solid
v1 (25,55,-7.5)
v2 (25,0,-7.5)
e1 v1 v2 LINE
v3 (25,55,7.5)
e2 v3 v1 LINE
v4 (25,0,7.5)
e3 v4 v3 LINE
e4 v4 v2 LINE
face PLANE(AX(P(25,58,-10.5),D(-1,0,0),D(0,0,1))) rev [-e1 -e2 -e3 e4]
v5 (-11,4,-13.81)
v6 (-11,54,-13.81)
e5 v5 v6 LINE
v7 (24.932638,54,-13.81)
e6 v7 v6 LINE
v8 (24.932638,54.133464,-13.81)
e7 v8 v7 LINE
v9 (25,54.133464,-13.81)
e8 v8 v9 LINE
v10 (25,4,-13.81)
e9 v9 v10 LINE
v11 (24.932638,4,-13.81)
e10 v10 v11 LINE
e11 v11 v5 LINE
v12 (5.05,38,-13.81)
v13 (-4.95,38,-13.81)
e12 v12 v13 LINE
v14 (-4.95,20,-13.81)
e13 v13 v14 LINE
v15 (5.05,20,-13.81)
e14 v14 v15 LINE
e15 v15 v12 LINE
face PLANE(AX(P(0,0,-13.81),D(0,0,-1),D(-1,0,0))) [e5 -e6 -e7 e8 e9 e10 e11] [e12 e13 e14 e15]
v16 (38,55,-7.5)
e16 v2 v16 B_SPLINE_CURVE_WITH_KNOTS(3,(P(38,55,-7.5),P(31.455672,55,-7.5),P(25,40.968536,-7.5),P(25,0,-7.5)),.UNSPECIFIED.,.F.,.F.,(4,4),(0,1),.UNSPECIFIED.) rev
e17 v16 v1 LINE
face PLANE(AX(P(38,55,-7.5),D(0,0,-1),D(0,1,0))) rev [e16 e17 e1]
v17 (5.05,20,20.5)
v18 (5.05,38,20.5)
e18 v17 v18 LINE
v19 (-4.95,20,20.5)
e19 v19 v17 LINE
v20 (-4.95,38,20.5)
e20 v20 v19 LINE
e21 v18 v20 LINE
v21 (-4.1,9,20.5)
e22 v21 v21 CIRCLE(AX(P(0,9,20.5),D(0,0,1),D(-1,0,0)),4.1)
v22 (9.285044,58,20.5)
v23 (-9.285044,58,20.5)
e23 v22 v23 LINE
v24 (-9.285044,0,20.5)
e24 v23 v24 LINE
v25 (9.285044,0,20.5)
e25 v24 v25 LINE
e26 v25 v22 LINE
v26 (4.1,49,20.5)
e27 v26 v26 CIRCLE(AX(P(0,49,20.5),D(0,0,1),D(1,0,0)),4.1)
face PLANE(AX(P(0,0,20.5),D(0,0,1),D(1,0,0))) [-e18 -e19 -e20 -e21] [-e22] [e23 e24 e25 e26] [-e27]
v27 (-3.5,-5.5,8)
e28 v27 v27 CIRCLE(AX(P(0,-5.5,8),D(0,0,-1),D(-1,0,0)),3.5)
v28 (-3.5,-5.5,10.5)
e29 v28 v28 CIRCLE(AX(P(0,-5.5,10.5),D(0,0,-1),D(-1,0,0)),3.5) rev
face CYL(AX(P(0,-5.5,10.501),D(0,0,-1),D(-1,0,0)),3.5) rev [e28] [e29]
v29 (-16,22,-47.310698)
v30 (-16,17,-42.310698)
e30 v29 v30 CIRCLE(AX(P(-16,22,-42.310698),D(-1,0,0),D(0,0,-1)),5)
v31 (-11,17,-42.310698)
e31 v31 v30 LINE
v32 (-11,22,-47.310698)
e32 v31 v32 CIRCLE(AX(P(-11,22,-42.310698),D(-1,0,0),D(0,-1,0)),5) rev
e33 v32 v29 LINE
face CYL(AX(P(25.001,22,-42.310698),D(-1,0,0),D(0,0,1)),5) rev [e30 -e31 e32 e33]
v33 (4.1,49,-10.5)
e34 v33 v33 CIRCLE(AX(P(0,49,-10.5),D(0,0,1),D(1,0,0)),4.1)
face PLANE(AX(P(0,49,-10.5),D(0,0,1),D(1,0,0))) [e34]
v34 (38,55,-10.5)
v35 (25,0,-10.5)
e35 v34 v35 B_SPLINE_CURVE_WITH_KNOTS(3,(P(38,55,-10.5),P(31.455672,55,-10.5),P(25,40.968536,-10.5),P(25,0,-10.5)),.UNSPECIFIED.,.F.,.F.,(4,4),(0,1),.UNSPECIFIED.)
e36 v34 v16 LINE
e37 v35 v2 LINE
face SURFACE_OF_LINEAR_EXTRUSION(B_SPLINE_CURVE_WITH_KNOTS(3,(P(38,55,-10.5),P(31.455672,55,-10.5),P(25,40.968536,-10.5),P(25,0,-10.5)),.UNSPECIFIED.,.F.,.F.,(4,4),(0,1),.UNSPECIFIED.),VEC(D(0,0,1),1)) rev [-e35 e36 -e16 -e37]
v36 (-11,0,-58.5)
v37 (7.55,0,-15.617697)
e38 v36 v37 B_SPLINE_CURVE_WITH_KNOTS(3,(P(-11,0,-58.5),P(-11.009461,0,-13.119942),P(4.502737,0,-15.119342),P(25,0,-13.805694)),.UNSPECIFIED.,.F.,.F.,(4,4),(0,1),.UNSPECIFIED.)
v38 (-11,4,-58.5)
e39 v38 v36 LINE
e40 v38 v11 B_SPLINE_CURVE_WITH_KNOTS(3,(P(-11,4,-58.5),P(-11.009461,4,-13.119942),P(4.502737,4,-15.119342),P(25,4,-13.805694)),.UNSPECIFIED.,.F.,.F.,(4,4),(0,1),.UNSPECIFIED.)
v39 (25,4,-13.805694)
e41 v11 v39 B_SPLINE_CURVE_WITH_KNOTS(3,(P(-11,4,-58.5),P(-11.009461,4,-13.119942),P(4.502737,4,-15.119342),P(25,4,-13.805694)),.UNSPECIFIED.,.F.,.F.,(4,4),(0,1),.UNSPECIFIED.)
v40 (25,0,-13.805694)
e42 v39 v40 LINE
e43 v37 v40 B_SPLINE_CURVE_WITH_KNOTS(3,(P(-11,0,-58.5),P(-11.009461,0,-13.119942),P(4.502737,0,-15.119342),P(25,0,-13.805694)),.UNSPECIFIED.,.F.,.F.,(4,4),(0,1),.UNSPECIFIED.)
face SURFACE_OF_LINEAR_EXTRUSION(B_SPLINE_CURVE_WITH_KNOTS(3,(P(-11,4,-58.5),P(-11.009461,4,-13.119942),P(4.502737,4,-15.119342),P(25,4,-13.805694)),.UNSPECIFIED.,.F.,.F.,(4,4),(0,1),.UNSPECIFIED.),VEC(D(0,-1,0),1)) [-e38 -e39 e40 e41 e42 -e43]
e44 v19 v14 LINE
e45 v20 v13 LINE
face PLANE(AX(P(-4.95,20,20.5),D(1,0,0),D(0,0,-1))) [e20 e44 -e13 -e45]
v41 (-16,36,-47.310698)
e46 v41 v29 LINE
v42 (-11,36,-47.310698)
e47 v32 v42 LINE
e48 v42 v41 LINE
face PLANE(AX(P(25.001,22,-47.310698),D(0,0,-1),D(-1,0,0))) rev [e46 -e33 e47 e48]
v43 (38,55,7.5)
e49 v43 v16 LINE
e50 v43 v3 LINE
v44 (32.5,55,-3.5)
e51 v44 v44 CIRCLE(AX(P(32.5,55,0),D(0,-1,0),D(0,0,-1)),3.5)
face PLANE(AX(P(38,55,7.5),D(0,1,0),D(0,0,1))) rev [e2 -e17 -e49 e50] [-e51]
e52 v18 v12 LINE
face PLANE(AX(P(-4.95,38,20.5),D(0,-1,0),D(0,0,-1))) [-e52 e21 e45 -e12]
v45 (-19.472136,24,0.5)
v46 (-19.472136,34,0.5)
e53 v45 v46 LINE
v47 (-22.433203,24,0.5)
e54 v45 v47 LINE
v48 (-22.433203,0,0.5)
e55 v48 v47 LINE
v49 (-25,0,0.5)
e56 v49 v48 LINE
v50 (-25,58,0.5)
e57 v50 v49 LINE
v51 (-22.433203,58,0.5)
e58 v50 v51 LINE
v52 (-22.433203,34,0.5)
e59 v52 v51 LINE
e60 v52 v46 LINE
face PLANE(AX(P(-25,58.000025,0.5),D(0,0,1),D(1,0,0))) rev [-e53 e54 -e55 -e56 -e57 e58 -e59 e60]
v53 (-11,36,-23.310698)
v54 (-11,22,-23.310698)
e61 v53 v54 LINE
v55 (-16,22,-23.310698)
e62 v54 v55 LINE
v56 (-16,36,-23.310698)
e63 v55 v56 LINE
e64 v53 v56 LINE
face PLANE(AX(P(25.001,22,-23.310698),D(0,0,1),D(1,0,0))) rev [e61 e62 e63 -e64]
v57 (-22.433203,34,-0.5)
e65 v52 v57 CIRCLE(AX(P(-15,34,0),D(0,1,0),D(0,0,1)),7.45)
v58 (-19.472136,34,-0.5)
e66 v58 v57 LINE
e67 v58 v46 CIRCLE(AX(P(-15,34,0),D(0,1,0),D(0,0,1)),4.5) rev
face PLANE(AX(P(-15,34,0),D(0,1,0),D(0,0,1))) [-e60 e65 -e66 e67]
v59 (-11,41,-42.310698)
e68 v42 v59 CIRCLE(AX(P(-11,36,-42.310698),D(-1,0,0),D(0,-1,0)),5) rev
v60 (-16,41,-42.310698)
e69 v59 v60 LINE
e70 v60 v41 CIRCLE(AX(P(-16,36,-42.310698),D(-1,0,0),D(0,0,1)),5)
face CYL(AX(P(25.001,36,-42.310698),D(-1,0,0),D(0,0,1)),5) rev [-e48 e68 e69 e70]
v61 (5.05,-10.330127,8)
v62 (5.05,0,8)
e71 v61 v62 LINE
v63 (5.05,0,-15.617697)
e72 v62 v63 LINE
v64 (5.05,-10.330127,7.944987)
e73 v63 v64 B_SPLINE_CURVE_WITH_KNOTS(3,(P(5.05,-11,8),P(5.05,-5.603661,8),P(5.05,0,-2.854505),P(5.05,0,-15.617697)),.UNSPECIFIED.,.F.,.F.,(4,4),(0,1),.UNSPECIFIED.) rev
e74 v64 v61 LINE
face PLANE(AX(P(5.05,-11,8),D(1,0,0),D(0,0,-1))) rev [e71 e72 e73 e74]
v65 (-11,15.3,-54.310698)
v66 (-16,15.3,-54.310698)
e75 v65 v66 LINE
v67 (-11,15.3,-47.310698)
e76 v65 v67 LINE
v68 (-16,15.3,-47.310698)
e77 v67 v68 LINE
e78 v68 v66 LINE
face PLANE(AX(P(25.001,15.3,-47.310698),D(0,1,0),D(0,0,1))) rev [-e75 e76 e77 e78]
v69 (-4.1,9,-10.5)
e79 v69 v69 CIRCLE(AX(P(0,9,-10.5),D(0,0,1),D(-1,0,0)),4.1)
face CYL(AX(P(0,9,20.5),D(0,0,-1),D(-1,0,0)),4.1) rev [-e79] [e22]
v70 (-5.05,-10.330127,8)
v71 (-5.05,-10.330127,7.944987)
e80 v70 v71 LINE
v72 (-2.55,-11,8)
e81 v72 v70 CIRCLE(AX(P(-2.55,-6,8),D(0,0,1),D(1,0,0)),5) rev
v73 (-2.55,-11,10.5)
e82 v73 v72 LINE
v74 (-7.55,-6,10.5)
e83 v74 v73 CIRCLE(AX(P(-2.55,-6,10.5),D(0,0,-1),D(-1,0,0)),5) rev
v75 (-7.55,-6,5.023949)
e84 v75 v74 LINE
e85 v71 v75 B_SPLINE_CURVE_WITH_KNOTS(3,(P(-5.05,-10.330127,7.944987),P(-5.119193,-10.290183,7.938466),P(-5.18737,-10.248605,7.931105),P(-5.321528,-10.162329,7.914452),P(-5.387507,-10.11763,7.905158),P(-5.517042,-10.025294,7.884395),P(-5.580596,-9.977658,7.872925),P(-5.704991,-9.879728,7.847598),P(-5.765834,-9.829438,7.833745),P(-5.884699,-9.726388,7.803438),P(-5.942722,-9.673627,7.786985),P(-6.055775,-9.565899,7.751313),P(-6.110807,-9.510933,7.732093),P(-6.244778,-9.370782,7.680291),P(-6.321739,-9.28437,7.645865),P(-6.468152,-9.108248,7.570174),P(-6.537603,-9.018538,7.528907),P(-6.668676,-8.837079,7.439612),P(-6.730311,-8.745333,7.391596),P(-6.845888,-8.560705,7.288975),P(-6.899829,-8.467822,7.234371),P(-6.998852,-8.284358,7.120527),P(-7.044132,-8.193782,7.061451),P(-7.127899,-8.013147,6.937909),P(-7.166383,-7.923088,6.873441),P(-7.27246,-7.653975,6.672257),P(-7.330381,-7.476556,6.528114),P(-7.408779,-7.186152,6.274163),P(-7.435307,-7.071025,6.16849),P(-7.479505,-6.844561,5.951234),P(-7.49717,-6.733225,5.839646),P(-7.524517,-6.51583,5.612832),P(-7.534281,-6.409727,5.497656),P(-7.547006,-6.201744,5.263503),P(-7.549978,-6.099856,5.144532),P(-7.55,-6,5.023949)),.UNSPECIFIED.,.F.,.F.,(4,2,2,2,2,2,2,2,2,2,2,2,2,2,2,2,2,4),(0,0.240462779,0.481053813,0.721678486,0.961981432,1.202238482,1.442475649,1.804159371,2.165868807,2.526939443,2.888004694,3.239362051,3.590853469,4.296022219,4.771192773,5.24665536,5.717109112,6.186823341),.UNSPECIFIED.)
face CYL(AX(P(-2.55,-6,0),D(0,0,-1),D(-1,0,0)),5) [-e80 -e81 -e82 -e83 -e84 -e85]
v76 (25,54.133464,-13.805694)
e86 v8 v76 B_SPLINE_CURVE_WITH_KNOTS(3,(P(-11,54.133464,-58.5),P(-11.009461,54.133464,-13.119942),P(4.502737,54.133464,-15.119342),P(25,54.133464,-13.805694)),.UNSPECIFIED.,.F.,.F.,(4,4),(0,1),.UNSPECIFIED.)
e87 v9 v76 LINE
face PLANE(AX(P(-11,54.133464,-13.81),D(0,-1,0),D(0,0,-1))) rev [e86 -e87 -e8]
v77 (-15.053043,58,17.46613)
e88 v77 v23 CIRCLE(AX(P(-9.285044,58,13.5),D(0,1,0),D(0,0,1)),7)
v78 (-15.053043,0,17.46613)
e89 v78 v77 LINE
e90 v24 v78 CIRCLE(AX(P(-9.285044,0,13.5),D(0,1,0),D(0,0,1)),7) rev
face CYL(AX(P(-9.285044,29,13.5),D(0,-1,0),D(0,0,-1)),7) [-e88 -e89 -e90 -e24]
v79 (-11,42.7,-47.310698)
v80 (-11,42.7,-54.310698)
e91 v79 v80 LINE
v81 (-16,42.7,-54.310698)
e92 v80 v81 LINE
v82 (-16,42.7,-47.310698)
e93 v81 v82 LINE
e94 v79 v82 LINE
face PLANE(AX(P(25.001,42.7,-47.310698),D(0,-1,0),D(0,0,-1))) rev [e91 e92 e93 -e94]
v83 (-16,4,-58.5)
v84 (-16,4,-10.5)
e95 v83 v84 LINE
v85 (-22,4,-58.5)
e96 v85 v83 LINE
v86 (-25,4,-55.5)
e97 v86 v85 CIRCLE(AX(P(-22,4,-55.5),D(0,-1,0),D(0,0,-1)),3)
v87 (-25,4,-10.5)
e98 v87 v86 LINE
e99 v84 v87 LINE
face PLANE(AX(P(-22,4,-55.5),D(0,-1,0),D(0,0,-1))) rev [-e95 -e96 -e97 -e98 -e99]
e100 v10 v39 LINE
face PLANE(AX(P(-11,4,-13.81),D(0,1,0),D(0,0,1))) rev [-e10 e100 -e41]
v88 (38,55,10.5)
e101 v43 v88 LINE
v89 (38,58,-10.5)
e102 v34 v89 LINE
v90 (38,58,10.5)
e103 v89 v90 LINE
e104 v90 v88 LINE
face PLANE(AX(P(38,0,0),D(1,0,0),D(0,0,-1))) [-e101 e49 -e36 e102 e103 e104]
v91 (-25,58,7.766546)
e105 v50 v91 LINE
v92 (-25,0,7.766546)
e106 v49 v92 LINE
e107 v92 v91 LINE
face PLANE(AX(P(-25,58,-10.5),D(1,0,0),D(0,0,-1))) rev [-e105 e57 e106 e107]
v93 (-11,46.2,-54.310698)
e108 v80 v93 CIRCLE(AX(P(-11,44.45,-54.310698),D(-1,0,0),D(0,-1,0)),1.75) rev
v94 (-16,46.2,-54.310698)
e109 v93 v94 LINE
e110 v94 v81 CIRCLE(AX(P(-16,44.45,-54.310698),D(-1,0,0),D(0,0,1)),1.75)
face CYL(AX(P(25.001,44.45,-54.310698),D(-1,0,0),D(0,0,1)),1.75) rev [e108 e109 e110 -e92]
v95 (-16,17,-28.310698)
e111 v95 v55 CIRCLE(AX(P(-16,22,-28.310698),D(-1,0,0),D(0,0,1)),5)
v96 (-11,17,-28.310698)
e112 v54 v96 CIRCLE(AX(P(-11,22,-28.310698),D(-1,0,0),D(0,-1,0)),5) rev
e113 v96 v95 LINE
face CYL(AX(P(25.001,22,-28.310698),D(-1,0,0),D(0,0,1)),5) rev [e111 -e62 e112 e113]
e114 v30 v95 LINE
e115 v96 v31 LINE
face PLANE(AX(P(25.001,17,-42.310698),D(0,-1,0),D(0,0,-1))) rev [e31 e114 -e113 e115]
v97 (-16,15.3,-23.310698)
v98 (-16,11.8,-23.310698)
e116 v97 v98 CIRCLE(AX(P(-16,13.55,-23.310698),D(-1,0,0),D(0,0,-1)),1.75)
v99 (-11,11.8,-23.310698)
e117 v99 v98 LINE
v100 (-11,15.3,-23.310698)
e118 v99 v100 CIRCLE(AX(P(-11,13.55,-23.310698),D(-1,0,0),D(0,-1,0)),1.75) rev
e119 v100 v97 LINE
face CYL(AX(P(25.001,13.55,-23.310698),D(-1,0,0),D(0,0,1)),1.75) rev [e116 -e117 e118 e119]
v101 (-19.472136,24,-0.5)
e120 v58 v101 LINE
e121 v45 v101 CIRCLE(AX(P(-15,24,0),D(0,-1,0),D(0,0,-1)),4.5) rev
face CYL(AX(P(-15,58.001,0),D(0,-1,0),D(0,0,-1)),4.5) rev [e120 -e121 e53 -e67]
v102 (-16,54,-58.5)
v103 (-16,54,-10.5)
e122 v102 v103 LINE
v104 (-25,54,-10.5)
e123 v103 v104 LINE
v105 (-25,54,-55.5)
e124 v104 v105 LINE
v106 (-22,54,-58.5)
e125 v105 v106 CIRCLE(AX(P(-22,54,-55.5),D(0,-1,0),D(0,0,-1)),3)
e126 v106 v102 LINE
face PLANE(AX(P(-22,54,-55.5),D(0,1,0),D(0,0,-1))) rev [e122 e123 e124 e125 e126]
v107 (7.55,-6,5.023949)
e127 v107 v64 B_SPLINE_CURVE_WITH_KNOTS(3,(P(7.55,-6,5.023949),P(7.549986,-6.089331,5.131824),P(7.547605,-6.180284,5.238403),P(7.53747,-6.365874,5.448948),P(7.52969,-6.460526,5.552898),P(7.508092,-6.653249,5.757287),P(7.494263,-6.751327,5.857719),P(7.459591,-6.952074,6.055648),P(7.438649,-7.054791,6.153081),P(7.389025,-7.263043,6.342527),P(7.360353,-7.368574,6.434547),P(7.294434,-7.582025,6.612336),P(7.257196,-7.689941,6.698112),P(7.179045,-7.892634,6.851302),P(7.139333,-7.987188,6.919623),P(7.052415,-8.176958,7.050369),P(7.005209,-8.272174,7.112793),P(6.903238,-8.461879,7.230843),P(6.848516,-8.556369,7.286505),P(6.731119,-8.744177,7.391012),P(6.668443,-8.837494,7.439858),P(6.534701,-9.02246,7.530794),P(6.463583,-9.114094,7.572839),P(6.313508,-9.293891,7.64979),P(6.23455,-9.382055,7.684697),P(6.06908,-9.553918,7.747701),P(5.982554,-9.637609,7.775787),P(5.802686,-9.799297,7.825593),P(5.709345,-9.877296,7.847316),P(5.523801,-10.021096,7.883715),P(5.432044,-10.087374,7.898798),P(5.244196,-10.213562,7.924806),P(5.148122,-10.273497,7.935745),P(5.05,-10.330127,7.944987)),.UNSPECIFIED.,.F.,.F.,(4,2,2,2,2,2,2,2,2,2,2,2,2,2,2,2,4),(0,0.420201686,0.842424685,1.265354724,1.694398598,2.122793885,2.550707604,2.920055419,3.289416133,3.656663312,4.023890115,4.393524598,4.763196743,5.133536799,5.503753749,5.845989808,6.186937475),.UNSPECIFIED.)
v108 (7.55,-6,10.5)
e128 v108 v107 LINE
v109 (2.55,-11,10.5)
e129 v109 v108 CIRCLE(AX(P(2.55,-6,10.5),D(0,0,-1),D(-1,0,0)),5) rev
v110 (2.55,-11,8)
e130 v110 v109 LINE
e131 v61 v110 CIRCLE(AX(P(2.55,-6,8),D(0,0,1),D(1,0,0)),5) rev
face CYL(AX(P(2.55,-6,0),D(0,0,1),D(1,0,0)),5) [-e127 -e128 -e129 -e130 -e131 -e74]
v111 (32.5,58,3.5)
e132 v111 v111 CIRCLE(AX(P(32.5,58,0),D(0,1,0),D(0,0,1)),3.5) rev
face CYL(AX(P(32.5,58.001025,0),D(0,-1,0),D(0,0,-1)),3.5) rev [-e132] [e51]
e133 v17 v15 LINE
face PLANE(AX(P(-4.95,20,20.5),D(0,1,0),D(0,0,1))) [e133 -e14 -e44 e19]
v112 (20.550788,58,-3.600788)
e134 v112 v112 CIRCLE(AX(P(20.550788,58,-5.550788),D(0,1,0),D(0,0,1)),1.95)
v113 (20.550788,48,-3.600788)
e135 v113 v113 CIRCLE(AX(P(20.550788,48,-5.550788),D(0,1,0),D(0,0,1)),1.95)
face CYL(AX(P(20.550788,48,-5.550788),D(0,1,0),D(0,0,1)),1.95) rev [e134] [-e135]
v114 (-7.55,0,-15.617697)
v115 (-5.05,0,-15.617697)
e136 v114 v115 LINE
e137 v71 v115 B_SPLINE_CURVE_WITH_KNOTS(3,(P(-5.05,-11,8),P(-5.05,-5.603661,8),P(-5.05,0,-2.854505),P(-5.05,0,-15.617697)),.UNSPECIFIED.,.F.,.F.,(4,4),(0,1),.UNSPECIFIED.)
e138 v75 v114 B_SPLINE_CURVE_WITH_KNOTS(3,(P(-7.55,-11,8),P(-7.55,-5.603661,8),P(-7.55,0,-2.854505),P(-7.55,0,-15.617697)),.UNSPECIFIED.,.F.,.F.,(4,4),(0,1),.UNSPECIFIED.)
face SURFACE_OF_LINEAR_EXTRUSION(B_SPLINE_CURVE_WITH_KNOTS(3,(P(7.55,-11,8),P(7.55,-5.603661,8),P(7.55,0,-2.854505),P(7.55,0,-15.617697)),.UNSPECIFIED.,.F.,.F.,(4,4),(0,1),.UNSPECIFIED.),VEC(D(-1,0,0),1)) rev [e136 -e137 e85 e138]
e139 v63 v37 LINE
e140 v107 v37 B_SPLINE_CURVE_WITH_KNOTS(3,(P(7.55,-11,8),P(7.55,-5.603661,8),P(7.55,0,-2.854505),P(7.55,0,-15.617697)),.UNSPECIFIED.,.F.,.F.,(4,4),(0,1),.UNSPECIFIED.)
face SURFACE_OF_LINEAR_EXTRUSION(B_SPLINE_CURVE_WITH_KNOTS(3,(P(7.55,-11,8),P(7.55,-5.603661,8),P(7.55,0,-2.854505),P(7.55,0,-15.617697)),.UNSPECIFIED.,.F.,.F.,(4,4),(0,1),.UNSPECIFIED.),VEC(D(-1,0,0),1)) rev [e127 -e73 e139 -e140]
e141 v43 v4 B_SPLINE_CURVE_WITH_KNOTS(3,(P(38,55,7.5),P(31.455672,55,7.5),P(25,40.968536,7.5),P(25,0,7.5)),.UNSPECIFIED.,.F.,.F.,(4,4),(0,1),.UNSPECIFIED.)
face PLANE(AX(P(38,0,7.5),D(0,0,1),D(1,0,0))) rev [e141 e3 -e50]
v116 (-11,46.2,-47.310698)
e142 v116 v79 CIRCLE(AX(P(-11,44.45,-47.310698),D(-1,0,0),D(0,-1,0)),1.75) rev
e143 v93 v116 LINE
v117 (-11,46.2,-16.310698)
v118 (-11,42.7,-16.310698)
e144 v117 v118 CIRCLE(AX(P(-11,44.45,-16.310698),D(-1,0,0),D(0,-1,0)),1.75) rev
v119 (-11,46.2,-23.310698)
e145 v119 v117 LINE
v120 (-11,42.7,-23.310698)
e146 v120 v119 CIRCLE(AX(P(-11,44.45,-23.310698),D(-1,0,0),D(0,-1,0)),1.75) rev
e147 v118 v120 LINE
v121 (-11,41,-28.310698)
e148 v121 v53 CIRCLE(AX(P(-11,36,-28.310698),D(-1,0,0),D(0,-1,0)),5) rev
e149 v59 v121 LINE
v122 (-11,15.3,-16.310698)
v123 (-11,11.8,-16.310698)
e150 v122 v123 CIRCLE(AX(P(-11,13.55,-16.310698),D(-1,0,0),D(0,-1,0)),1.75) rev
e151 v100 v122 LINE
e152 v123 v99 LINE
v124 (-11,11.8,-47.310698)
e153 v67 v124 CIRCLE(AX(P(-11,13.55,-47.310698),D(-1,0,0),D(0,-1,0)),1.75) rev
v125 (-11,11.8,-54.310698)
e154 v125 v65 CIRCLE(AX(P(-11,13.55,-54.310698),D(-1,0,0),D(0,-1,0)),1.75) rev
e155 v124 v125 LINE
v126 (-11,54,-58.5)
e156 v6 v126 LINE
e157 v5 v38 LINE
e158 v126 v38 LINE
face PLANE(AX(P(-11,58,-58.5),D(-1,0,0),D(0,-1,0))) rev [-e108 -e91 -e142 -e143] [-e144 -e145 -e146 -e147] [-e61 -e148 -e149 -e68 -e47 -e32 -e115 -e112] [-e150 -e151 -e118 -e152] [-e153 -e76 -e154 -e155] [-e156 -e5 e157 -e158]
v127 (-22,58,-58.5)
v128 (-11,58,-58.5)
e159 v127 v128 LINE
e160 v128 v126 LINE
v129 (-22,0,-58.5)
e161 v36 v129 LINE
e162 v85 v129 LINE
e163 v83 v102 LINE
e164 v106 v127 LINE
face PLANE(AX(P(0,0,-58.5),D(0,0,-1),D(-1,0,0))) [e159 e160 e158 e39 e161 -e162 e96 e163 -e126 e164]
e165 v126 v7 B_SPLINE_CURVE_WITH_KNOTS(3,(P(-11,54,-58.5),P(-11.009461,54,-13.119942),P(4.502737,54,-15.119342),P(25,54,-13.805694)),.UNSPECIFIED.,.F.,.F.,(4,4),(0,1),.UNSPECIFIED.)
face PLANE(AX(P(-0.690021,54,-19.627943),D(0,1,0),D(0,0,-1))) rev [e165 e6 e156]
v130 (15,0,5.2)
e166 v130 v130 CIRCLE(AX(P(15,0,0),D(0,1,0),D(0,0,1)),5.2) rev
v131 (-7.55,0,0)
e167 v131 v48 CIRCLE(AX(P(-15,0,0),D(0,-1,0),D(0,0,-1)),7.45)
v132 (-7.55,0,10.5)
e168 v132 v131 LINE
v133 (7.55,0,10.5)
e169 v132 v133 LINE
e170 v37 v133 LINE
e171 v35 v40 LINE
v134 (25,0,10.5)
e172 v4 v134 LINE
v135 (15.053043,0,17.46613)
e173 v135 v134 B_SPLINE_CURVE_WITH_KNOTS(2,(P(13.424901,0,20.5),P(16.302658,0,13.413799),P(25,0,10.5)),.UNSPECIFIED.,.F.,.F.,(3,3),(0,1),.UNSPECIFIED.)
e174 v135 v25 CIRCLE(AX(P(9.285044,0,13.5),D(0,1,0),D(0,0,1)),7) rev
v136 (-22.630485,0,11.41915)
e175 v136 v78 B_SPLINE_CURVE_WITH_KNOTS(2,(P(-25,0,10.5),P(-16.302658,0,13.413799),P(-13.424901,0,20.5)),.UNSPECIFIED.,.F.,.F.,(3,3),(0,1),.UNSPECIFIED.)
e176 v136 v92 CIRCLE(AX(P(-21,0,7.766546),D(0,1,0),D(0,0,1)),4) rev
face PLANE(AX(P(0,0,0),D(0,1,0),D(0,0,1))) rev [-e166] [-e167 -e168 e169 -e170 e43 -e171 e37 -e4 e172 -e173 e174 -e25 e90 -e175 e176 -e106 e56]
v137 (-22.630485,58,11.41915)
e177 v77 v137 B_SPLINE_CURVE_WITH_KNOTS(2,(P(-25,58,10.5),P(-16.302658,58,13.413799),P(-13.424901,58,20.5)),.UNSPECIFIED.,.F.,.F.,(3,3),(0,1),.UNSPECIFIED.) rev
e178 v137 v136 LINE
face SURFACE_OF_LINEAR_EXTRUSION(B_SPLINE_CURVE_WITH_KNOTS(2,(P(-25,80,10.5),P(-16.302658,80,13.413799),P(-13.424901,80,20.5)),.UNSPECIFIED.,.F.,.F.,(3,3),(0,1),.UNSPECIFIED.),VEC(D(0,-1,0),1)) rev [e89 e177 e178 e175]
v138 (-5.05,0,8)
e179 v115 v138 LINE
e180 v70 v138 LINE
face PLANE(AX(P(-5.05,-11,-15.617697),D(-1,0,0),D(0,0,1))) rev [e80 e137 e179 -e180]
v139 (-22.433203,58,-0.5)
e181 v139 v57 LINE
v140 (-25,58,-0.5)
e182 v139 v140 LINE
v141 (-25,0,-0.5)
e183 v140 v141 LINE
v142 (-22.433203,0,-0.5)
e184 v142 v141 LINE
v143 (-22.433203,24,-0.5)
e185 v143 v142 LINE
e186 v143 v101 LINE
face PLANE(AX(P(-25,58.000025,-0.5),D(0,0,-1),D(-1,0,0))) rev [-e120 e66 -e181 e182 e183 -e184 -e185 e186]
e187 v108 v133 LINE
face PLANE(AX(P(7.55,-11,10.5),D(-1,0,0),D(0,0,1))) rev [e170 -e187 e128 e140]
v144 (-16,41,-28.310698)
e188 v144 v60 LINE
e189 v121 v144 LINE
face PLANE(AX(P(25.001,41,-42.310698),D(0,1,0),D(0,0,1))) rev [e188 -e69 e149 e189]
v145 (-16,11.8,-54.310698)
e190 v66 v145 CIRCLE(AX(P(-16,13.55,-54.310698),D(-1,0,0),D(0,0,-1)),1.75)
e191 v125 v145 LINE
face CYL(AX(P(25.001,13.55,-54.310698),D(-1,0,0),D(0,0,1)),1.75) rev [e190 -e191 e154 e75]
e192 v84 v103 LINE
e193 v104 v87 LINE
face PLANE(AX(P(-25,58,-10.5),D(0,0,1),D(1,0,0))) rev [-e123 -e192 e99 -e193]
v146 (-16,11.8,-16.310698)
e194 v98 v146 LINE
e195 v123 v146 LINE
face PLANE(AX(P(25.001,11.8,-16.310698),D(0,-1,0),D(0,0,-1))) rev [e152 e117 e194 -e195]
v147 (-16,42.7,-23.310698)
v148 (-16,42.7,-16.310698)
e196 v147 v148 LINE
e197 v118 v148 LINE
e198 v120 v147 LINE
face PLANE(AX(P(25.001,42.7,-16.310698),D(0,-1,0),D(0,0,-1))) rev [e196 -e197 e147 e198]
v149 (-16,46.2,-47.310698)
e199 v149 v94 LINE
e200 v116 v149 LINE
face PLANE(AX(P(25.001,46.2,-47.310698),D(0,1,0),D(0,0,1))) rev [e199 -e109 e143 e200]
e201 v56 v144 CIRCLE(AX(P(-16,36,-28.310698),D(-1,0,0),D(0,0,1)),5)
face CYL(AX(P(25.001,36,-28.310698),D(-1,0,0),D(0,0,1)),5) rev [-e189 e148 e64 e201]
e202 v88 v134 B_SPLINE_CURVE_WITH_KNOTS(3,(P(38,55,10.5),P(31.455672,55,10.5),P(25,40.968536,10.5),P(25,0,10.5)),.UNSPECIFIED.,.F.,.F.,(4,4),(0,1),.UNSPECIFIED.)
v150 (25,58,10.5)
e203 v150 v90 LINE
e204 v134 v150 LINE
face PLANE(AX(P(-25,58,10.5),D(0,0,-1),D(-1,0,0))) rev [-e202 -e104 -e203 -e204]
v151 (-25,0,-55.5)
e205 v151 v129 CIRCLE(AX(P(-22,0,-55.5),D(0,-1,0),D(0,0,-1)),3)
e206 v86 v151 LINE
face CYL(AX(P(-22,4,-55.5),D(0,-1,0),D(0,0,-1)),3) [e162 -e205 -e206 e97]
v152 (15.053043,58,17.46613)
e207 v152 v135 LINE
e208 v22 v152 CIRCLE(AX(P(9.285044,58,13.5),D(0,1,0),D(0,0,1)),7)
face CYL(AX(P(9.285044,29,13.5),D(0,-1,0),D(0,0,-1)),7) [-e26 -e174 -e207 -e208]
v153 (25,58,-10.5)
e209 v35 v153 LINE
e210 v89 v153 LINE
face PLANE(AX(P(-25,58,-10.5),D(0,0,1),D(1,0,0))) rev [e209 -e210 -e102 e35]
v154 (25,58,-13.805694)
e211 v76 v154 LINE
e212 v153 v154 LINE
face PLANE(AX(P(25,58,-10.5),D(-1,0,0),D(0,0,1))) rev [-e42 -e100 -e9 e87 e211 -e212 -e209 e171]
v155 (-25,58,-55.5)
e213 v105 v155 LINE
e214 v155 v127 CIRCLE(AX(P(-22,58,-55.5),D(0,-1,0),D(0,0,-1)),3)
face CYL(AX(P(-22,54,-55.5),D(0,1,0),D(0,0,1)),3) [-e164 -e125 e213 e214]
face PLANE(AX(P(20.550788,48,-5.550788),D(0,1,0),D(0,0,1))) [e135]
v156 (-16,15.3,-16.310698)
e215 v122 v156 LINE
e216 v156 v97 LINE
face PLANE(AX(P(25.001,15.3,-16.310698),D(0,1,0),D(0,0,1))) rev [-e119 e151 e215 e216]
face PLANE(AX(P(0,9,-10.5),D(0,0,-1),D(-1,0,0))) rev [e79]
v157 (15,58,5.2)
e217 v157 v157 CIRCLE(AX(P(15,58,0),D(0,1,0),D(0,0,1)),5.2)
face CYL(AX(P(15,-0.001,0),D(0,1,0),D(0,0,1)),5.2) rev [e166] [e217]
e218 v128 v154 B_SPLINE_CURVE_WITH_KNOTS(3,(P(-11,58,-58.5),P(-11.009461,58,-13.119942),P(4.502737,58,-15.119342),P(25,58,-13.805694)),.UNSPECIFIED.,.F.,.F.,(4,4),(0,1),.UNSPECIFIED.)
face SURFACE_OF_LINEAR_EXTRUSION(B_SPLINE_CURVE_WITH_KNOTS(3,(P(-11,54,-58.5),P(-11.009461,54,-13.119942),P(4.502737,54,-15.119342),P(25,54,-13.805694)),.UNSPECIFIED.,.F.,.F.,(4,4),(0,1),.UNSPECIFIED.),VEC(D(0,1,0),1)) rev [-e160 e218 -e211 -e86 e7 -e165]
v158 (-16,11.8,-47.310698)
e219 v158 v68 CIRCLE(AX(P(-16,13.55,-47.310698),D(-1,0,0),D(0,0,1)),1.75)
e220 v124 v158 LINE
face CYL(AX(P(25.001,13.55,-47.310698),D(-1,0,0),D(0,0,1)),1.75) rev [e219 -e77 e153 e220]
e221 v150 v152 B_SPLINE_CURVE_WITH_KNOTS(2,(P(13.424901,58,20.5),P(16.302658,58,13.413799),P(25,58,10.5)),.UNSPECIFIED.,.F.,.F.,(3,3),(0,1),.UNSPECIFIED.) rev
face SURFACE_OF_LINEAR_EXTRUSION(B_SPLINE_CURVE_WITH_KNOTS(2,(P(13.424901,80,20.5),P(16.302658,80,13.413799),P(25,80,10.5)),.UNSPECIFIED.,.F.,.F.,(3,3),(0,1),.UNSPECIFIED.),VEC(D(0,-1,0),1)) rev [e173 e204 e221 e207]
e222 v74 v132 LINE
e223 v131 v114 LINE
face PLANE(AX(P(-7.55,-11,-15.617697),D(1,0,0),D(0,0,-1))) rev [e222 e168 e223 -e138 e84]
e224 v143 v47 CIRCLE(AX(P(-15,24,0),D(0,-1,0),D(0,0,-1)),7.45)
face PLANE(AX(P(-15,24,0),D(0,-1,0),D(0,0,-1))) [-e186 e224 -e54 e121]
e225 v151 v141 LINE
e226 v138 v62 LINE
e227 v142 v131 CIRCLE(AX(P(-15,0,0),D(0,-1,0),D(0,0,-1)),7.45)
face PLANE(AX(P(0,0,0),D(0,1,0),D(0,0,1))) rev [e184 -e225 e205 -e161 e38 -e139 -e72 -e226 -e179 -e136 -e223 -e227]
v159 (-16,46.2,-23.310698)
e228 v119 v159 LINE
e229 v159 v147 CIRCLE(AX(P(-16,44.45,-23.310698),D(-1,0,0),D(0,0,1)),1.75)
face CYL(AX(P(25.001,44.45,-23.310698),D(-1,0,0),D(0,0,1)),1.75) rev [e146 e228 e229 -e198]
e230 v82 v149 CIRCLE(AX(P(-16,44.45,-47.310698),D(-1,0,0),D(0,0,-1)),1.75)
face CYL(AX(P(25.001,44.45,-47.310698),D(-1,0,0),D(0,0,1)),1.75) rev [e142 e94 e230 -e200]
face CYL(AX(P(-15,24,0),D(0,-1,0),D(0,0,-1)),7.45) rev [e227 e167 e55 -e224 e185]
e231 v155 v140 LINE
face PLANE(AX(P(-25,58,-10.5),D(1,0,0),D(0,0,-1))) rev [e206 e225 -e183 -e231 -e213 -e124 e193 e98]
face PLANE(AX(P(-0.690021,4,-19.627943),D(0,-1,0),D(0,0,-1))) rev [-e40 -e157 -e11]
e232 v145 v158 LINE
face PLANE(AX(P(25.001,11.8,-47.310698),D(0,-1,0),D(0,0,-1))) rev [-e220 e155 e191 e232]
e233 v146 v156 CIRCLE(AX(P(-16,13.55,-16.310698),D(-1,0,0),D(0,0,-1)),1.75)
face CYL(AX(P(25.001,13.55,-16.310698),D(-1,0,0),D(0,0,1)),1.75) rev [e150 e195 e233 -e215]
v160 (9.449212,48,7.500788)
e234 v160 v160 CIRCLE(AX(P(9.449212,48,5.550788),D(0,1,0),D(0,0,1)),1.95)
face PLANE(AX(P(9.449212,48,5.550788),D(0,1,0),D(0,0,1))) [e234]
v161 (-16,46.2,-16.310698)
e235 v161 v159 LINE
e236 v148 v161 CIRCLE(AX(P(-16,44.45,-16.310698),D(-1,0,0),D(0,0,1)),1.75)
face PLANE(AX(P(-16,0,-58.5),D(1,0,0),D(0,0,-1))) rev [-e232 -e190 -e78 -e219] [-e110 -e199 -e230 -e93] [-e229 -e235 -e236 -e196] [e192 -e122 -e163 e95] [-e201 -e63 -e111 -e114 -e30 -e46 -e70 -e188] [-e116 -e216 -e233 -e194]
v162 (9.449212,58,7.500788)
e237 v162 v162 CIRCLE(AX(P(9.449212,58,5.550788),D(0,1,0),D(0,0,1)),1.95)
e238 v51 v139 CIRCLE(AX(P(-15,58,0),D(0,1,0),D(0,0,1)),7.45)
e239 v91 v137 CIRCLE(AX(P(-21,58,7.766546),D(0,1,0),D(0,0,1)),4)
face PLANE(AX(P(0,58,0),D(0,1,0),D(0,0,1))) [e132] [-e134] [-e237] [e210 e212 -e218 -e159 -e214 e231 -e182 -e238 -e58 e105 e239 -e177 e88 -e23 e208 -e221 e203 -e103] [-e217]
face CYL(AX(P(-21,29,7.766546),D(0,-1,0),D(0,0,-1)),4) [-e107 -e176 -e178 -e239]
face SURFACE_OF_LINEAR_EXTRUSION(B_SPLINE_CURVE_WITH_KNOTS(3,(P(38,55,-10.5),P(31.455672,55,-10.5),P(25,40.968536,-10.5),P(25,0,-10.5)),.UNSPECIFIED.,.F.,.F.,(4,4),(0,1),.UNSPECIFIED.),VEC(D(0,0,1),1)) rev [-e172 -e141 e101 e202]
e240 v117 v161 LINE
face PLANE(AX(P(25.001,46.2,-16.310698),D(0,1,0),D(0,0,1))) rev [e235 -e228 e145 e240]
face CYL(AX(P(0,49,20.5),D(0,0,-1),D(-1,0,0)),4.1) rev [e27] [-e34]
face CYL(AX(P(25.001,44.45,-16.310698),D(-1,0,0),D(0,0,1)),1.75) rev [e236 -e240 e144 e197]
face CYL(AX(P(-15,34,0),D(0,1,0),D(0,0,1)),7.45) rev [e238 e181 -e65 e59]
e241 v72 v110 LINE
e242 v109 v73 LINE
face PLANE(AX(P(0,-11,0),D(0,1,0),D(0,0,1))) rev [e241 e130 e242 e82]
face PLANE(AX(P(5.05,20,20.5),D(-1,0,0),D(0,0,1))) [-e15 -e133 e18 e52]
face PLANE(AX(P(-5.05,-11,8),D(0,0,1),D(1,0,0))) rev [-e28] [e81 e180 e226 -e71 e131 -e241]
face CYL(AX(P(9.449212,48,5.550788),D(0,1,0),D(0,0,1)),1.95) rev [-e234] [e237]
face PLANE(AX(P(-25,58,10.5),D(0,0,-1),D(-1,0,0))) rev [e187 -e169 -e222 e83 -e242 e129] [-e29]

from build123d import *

# Parameters (mm, degrees)
SKETCH1_W                      = 50
SKETCH1_H                      = 21
BOSS_EXTRUDE1_DEPTH            = 58
SKETCH3_R                      = 7.45
CUT_EXTRUDE1_DEPTH             = 24
CUT_EXTRUDE2_REACH             = 66.025
SKETCH4_R                      = 5.2
CUT_EXTRUDE3_START             = -24
SKETCH5_R                      = 7.45
CUT_EXTRUDE3_DEPTH             = 24
CUT_EXTRUDE4_REACH             = 66.025
SKETCH6_R                      = 4.5
SKETCH9_W                      = 5
SKETCH9_H                      = 58
BOSS_EXTRUDE3_DEPTH            = 48
CUT_EXTRUDE7_REACH             = 94.018
BOSS_EXTRUDE4_START            = -4
BOSS_EXTRUDE4_DEPTH            = 4
SKETCH19_R                     = 1.95
CUT_EXTRUDE11_DEPTH            = 10
CUT_EXTRUDE12_DEPTH            = 87.088617298
CUT_EXTRUDE12_DEPTH_BACK       = 87.088617298
SKETCH20_W                     = 5.527864045
SKETCH20_H                     = 1
BOSS_EXTRUDE5_DEPTH            = 13
CUT_EXTRUDE13_START            = -21
CUT_EXTRUDE13_DEPTH            = 21
CUT_EXTRUDE14_REACH            = 90.833
SKETCH23_R                     = 3.5
BOSS_EXTRUDE7_DEPTH            = 11
CUT_EXTRUDE15_REACH            = 98.074
SKETCH26_R                     = 3.5
CUT_EXTRUDE16_DEPTH            = 15.1
SKETCH29_W                     = 50
SKETCH29_H                     = 58
BOSS_EXTRUDE8_DEPTH            = 10
CUT_EXTRUDE17_DEPTH            = 80
FILLET3_R                      = 7
FILLET5_R                      = 7
FILLET6_R                      = 4
SKETCH31_W                     = 36
SKETCH31_H                     = 50.133464381
BOSS_EXTRUDE9_DEPTH            = 3.31
CUT_EXTRUDE8_DEPTH             = 98.82126575
CUT_EXTRUDE8_DEPTH_BACK        = 21
SKETCH7_R                      = 4.1
CUT_EXTRUDE5_REACH             = 99.821
SKETCH8_W                      = 10
SKETCH8_H                      = 18
CUT_EXTRUDE5_DIRECTION_2_DEPTH = 98.82126575
FILLET7_R                      = 5


# Read off the part's stored shape, not the designer's step: Boss-Extrude4
with BuildPart() as part:
    # Sketch1 → Boss-Extrude1 (new body)
    with BuildSketch(Plane(origin=(0, 0, 0), x_dir=(1, 0, 0), z_dir=(0, 1, 0))):
        Rectangle(SKETCH1_W, SKETCH1_H)
    extrude(amount=BOSS_EXTRUDE1_DEPTH)

    # Sketch3 → Cut-Extrude1 (cut)
    with BuildSketch(Plane(origin=(0, 58, 0), x_dir=(1, 0, 0), z_dir=(0, 1, 0))):
        with Locations(Location((-15, 0, 0), (0, 0, 270))):
            Circle(SKETCH3_R)
    extrude(amount=-CUT_EXTRUDE1_DEPTH, mode=Mode.SUBTRACT)

    # Sketch4 → Cut-Extrude2 (cut, up to next)
    with BuildSketch(Plane(origin=(0, 58, 0), x_dir=(1, 0, 0), z_dir=(0, 1, 0)), mode=Mode.PRIVATE) as cut_extrude2_sk1:
        with Locations(Location((15, 0, 0), (0, 0, 270))):
            Circle(SKETCH4_R)
    cut_extrude2_tool1 = extrude(cut_extrude2_sk1.sketch, amount=-CUT_EXTRUDE2_REACH, mode=Mode.PRIVATE) & part.part
    add(cut_extrude2_tool1.solids().sort_by_distance((15, 58, 0))[0], mode=Mode.SUBTRACT)

    # Sketch5 → Cut-Extrude3 (cut)
    with BuildSketch(Plane.XZ.offset(CUT_EXTRUDE3_START)):
        with Locations(Location((-15, 0, 0), (0, 0, 90))):
            Circle(SKETCH5_R)
    extrude(amount=CUT_EXTRUDE3_DEPTH, mode=Mode.SUBTRACT)

    # Sketch6 → Cut-Extrude4 (cut, up to next)
    with BuildSketch(Plane.XZ, mode=Mode.PRIVATE) as cut_extrude4_sk1:
        with Locations(Location((-15, 0, 0), (0, 0, 270))):
            Circle(SKETCH6_R)
    cut_extrude4_tool1 = extrude(cut_extrude4_sk1.sketch, amount=-CUT_EXTRUDE4_REACH, mode=Mode.PRIVATE) & part.part
    add(cut_extrude4_tool1.solids().sort_by_distance((-15, 0, 0))[0], mode=Mode.SUBTRACT)

    # Sketch9 → Boss-Extrude3 (add)
    with BuildSketch(Plane(origin=(0, 0, -10.5), x_dir=(-1, 0, 0), z_dir=(0, 0, -1))):
        with Locations((13.5, 29)):
            Rectangle(SKETCH9_W, SKETCH9_H)
    extrude(amount=BOSS_EXTRUDE3_DEPTH)

    # Sketch10 → Cut-Extrude7 (cut, up to next)
    with BuildSketch(Plane.ZY.offset(16), mode=Mode.PRIVATE) as cut_extrude7_sk1:
        with BuildLine():
            Line((-47.310698145, 46.2), (-54.310698145, 46.2))
            ThreePointArc((-54.310698145, 46.2), (-56.060698145, 44.45), (-54.310698145, 42.7))
            Line((-54.310698145, 42.7), (-47.310698145, 42.7))
            ThreePointArc((-47.310698145, 42.7), (-45.560698145, 44.45), (-47.310698145, 46.2))
        make_face()
    cut_extrude7_tool1 = extrude(cut_extrude7_sk1.sketch, amount=-CUT_EXTRUDE7_REACH, mode=Mode.PRIVATE) & part.part
    # Sketch10 → Cut-Extrude7 (cut, up to next)
    with BuildSketch(Plane.ZY.offset(16), mode=Mode.PRIVATE) as cut_extrude7_sk2:
        with BuildLine():
            Line((-42.310698145, 17), (-28.310698145, 17))
            ThreePointArc((-28.310698145, 17), (-24.775164239, 18.464466094), (-23.310698145, 22))
            Line((-23.310698145, 22), (-23.310698145, 36))
            ThreePointArc((-23.310698145, 36), (-24.775164239, 39.535533906), (-28.310698145, 41))
            Line((-28.310698145, 41), (-42.310698145, 41))
            ThreePointArc((-42.310698145, 41), (-45.84623205, 39.535533906), (-47.310698145, 36))
            Line((-47.310698145, 36), (-47.310698145, 22))
            ThreePointArc((-47.310698145, 22), (-45.84623205, 18.464466094), (-42.310698145, 17))
        make_face()
    cut_extrude7_tool2 = extrude(cut_extrude7_sk2.sketch, amount=-CUT_EXTRUDE7_REACH, mode=Mode.PRIVATE) & part.part
    # Sketch10 → Cut-Extrude7 (cut, up to next)
    with BuildSketch(Plane.ZY.offset(16), mode=Mode.PRIVATE) as cut_extrude7_sk3:
        with BuildLine():
            Line((-16.310698145, 15.3), (-23.310698145, 15.3))
            ThreePointArc((-23.310698145, 15.3), (-25.060698145, 13.55), (-23.310698145, 11.8))
            Line((-23.310698145, 11.8), (-16.310698145, 11.8))
            ThreePointArc((-16.310698145, 11.8), (-14.560698145, 13.55), (-16.310698145, 15.3))
        make_face()
    cut_extrude7_tool3 = extrude(cut_extrude7_sk3.sketch, amount=-CUT_EXTRUDE7_REACH, mode=Mode.PRIVATE) & part.part
    # Sketch10 → Cut-Extrude7 (cut, up to next)
    with BuildSketch(Plane.ZY.offset(16), mode=Mode.PRIVATE) as cut_extrude7_sk4:
        with BuildLine():
            Line((-47.310698145, 11.8), (-54.310698145, 11.8))
            ThreePointArc((-54.310698145, 11.8), (-56.060698145, 13.55), (-54.310698145, 15.3))
            Line((-54.310698145, 15.3), (-47.310698145, 15.3))
            ThreePointArc((-47.310698145, 15.3), (-45.560698145, 13.55), (-47.310698145, 11.8))
        make_face()
    cut_extrude7_tool4 = extrude(cut_extrude7_sk4.sketch, amount=-CUT_EXTRUDE7_REACH, mode=Mode.PRIVATE) & part.part
    # Sketch10 → Cut-Extrude7 (cut, up to next)
    with BuildSketch(Plane.ZY.offset(16), mode=Mode.PRIVATE) as cut_extrude7_sk5:
        with BuildLine():
            Line((-16.310698145, 46.2), (-23.310698145, 46.2))
            ThreePointArc((-23.310698145, 46.2), (-25.060698145, 44.45), (-23.310698145, 42.7))
            Line((-23.310698145, 42.7), (-16.310698145, 42.7))
            ThreePointArc((-16.310698145, 42.7), (-14.560698145, 44.45), (-16.310698145, 46.2))
        make_face()
    cut_extrude7_tool5 = extrude(cut_extrude7_sk5.sketch, amount=-CUT_EXTRUDE7_REACH, mode=Mode.PRIVATE) & part.part
    add(cut_extrude7_tool1.solids().sort_by_distance((-16, 44.45, -50.810698))[0], mode=Mode.SUBTRACT)
    add(cut_extrude7_tool2.solids().sort_by_distance((-16, 29, -35.310698))[0], mode=Mode.SUBTRACT)
    add(cut_extrude7_tool3.solids().sort_by_distance((-16, 13.55, -19.810698))[0], mode=Mode.SUBTRACT)
    add(cut_extrude7_tool4.solids().sort_by_distance((-16, 13.55, -50.810698))[0], mode=Mode.SUBTRACT)
    add(cut_extrude7_tool5.solids().sort_by_distance((-16, 44.45, -19.810698))[0], mode=Mode.SUBTRACT)

    # Boss-Extrude4 outline → Boss-Extrude4 (add)
    with BuildSketch(Plane(origin=(0, 0, 0), x_dir=(-1, 0, 0), z_dir=(0, -1, 0)).offset(BOSS_EXTRUDE4_START)):
        with BuildLine():
            Line((11, 10.5), (11, 58.5))
            add(Edge.make_bspline(
                [(11, 58.5), (11.009460691, 13.119942058), (-4.502737222, 15.119341911), (-25, 13.805693573)],
                knots=[0, 0, 0, 0, 1, 1, 1, 1], degree=3))
            Line((-25, 13.805693573), (-25, 10.5))
            Line((-25, 10.5), (11, 10.5))
        make_face()
        with BuildLine():
            Line((22, 58.5), (16, 58.5))
            Line((16, 58.5), (16, 10.5))
            Line((16, 10.5), (25, 10.5))
            Line((25, 10.5), (25, 55.5))
            ThreePointArc((25, 55.5), (24.121320344, 57.621320344), (22, 58.5))
        make_face()
    boss_extrude4 = extrude(amount=BOSS_EXTRUDE4_DEPTH)

    # Mirror1: Boss-Extrude4 across plane
    add(boss_extrude4.mirror(Plane(origin=(0, 29, 0), x_dir=(0, 0, 1), z_dir=(0, -1, 0))))

    # Sketch19 → Cut-Extrude11 (cut)
    with BuildSketch(Plane(origin=(0, 58, 0), x_dir=(1, 0, 0), z_dir=(0, 1, 0))):
        with Locations(Location((20.550788232, 5.550788232, 0), (0, 0, 270))):
            Circle(SKETCH19_R)
        with Locations(Location((9.449211768, -5.550788232, 0), (0, 0, 270))):
            Circle(SKETCH19_R)
    extrude(amount=-CUT_EXTRUDE11_DEPTH, mode=Mode.SUBTRACT)

    # Sketch20 → Cut-Extrude12 (cut, two sides: drawn at the far end of the back side and taken through both)
    with BuildSketch(Plane.XZ.offset(-CUT_EXTRUDE12_DEPTH_BACK)):
        with Locations((-22.236067977, 0)):
            Rectangle(SKETCH20_W, SKETCH20_H)
    extrude(amount=CUT_EXTRUDE12_DEPTH + CUT_EXTRUDE12_DEPTH_BACK, mode=Mode.SUBTRACT)

    # Sketch21 → Boss-Extrude5 (add)
    with BuildSketch(Plane(origin=(25, 0, 0), x_dir=(0, 0, -1), z_dir=(1, 0, 0))):
        Polygon((10.5, 0), (10.5, 58), (-10.5, 58), (-10.5, 0), (-7.5, 0), (-7.5, 55), (7.5, 55), (7.5, 0), align=None)
    extrude(amount=BOSS_EXTRUDE5_DEPTH)

    # Sketch22 → Cut-Extrude13 (cut)
    with BuildSketch(Plane.XY.offset(10.5).offset(CUT_EXTRUDE13_START)):
        with BuildLine():
            Line((25, 0), (38, 0))
            Line((38, 0), (38, 55))
            add(Edge.make_bspline(
                [(38, 55), (31.45567161, 55), (25, 40.968536323), (25, 0)],
                knots=[0, 0, 0, 0, 1, 1, 1, 1], degree=3))
        make_face()
    extrude(amount=CUT_EXTRUDE13_DEPTH, mode=Mode.SUBTRACT)

    # Sketch23 → Cut-Extrude14 (cut, up to next)
    with BuildSketch(Plane.XZ.offset(-55), mode=Mode.PRIVATE) as cut_extrude14_sk1:
        with Locations(Location((32.5, 0, 0), (0, 0, 270))):
            Circle(SKETCH23_R)
    cut_extrude14_tool1 = extrude(cut_extrude14_sk1.sketch, amount=-CUT_EXTRUDE14_REACH, mode=Mode.PRIVATE) & part.part
    add(cut_extrude14_tool1.solids().sort_by_distance((32.5, 55, 0))[0], mode=Mode.SUBTRACT)

    # Sketch24 → Boss-Extrude7 (add)
    with BuildSketch(Plane.XZ):
        Polygon((7.55, 10.5), (7.55, -15.617697267), (5.05, -15.617697267), (5.05, 8), (-5.05, 8), (-5.05, -15.617697267), (-7.55, -15.617697267), (-7.55, 10.5), align=None)
    extrude(amount=BOSS_EXTRUDE7_DEPTH)

    # Sketch26 → Cut-Extrude15 (cut, up to next)
    with BuildSketch(Plane(origin=(0, 0, 8), x_dir=(-1, 0, 0), z_dir=(0, 0, -1)), mode=Mode.PRIVATE) as cut_extrude15_sk1:
        with Locations((0, -5.5)):
            Circle(SKETCH26_R)
    cut_extrude15_tool1 = extrude(cut_extrude15_sk1.sketch, amount=-CUT_EXTRUDE15_REACH, mode=Mode.PRIVATE) & part.part
    add(cut_extrude15_tool1.solids().sort_by_distance((0, -5.5, 8))[0], mode=Mode.SUBTRACT)

    # Sketch27 → Cut-Extrude16 (cut)
    with BuildSketch(Plane.ZY.offset(7.55)):
        with BuildLine():
            Line((8, -11), (-15.617697267, -11))
            Line((-15.617697267, -11), (-15.617697267, 0))
            add(Edge.make_bspline(
                [(8, -11), (8, -5.603660731), (-2.854504572, 0), (-15.617697267, 0)],
                knots=[0, 0, 0, 0, 1, 1, 1, 1], degree=3))
        make_face()
    extrude(amount=-CUT_EXTRUDE16_DEPTH, mode=Mode.SUBTRACT)

    # Sketch29 → Boss-Extrude8 (add)
    with BuildSketch(Plane.XY.offset(10.5)):
        with Locations((0, 29)):
            Rectangle(SKETCH29_W, SKETCH29_H)
    extrude(amount=BOSS_EXTRUDE8_DEPTH)

    # Sketch30 → Cut-Extrude17 (cut)
    with BuildSketch(Plane.XZ):
        with BuildLine():
            Line((25, 10.5), (25, 20.5))
            Line((25, 20.5), (13.424901186, 20.5))
            add(Edge.make_bspline(
                [(25, 10.5), (16.30265807, 13.413799082), (13.424901186, 20.5)],
                knots=[0, 0, 0, 1, 1, 1], degree=2))
        make_face()
        with BuildLine():
            Line((-13.424901186, 20.5), (-25, 20.5))
            Line((-25, 20.5), (-25, 10.5))
            add(Edge.make_bspline(
                [(-25, 10.5), (-16.30265807, 13.413799082), (-13.424901186, 20.5)],
                knots=[0, 0, 0, 1, 1, 1], degree=2))
        make_face()
    extrude(amount=-CUT_EXTRUDE17_DEPTH, mode=Mode.SUBTRACT)

    # Fillet3
    fillet3_edges = [part.edges().sort_by_distance(p)[0] for p in [
        (13.424901186, 29, 20.5),
    ]]
    fillet(fillet3_edges, radius=FILLET3_R)

    # Fillet5
    fillet5_edges = [part.edges().sort_by_distance(p)[0] for p in [
        (-13.424901186, 29, 20.5),
    ]]
    fillet(fillet5_edges, radius=FILLET5_R)

    # Fillet6
    fillet6_edges = [part.edges().sort_by_distance(p)[0] for p in [
        (-25, 29, 10.5),
    ]]
    fillet(fillet6_edges, radius=FILLET6_R)

    # Sketch31 → Boss-Extrude9 (add)
    with BuildSketch(Plane(origin=(0, 0, -10.5), x_dir=(-1, 0, 0), z_dir=(0, 0, -1))):
        with Locations((-7, 29.066732191)):
            Rectangle(SKETCH31_W, SKETCH31_H)
    extrude(amount=BOSS_EXTRUDE9_DEPTH)

    # Sketch7 → Cut-Extrude8 (cut, two sides: drawn at the far end of the back side and taken through both)
    with BuildSketch(Plane.XY.offset(10.5).offset(-CUT_EXTRUDE8_DEPTH_BACK)):
        with Locations((0, 49)):
            Circle(SKETCH7_R)
        with Locations(Location((0, 9, 0), (0, 0, 180))):
            Circle(SKETCH7_R)
    extrude(amount=CUT_EXTRUDE8_DEPTH + CUT_EXTRUDE8_DEPTH_BACK, mode=Mode.SUBTRACT)

    # Sketch8 → Cut-Extrude5 (cut, up to next)
    with BuildSketch(Plane.XY.offset(10.5), mode=Mode.PRIVATE) as cut_extrude5_sk1:
        with Locations((0.05, 29)):
            Rectangle(SKETCH8_W, SKETCH8_H)
    cut_extrude5_tool1 = extrude(cut_extrude5_sk1.sketch, amount=-CUT_EXTRUDE5_REACH, mode=Mode.PRIVATE) & part.part
    add(cut_extrude5_tool1.solids().sort_by_distance((0.05, 29, 10.5))[0], mode=Mode.SUBTRACT)

    # Sketch8 → Cut-Extrude5 direction 2 (cut)
    with BuildSketch(Plane.XY.offset(10.5)):
        with Locations((0.05, 29)):
            Rectangle(SKETCH8_W, SKETCH8_H)
    extrude(amount=CUT_EXTRUDE5_DIRECTION_2_DEPTH, mode=Mode.SUBTRACT)

    # Fillet7
    # the kernel refuses this fillet: 5 mm, written as the material it takes off along each edge
    with BuildSketch(Plane(origin=(7.55, -11, 23), x_dir=(-1, 0, 0), z_dir=(0, 0, -1)), Plane(origin=(-7.55, -11, -4.5), x_dir=(1, 0, 0), z_dir=(0, 0, 1))) as fillet7_piece_1:
        with BuildLine():
            CenterArc((FILLET7_R, FILLET7_R), FILLET7_R, 180, 90)
            Line((0, FILLET7_R), (0, 0))
            Line((0, 0), (FILLET7_R, 0))
        make_face()
    extrude(amount=27.5, mode=Mode.SUBTRACT)


solid = part.part
